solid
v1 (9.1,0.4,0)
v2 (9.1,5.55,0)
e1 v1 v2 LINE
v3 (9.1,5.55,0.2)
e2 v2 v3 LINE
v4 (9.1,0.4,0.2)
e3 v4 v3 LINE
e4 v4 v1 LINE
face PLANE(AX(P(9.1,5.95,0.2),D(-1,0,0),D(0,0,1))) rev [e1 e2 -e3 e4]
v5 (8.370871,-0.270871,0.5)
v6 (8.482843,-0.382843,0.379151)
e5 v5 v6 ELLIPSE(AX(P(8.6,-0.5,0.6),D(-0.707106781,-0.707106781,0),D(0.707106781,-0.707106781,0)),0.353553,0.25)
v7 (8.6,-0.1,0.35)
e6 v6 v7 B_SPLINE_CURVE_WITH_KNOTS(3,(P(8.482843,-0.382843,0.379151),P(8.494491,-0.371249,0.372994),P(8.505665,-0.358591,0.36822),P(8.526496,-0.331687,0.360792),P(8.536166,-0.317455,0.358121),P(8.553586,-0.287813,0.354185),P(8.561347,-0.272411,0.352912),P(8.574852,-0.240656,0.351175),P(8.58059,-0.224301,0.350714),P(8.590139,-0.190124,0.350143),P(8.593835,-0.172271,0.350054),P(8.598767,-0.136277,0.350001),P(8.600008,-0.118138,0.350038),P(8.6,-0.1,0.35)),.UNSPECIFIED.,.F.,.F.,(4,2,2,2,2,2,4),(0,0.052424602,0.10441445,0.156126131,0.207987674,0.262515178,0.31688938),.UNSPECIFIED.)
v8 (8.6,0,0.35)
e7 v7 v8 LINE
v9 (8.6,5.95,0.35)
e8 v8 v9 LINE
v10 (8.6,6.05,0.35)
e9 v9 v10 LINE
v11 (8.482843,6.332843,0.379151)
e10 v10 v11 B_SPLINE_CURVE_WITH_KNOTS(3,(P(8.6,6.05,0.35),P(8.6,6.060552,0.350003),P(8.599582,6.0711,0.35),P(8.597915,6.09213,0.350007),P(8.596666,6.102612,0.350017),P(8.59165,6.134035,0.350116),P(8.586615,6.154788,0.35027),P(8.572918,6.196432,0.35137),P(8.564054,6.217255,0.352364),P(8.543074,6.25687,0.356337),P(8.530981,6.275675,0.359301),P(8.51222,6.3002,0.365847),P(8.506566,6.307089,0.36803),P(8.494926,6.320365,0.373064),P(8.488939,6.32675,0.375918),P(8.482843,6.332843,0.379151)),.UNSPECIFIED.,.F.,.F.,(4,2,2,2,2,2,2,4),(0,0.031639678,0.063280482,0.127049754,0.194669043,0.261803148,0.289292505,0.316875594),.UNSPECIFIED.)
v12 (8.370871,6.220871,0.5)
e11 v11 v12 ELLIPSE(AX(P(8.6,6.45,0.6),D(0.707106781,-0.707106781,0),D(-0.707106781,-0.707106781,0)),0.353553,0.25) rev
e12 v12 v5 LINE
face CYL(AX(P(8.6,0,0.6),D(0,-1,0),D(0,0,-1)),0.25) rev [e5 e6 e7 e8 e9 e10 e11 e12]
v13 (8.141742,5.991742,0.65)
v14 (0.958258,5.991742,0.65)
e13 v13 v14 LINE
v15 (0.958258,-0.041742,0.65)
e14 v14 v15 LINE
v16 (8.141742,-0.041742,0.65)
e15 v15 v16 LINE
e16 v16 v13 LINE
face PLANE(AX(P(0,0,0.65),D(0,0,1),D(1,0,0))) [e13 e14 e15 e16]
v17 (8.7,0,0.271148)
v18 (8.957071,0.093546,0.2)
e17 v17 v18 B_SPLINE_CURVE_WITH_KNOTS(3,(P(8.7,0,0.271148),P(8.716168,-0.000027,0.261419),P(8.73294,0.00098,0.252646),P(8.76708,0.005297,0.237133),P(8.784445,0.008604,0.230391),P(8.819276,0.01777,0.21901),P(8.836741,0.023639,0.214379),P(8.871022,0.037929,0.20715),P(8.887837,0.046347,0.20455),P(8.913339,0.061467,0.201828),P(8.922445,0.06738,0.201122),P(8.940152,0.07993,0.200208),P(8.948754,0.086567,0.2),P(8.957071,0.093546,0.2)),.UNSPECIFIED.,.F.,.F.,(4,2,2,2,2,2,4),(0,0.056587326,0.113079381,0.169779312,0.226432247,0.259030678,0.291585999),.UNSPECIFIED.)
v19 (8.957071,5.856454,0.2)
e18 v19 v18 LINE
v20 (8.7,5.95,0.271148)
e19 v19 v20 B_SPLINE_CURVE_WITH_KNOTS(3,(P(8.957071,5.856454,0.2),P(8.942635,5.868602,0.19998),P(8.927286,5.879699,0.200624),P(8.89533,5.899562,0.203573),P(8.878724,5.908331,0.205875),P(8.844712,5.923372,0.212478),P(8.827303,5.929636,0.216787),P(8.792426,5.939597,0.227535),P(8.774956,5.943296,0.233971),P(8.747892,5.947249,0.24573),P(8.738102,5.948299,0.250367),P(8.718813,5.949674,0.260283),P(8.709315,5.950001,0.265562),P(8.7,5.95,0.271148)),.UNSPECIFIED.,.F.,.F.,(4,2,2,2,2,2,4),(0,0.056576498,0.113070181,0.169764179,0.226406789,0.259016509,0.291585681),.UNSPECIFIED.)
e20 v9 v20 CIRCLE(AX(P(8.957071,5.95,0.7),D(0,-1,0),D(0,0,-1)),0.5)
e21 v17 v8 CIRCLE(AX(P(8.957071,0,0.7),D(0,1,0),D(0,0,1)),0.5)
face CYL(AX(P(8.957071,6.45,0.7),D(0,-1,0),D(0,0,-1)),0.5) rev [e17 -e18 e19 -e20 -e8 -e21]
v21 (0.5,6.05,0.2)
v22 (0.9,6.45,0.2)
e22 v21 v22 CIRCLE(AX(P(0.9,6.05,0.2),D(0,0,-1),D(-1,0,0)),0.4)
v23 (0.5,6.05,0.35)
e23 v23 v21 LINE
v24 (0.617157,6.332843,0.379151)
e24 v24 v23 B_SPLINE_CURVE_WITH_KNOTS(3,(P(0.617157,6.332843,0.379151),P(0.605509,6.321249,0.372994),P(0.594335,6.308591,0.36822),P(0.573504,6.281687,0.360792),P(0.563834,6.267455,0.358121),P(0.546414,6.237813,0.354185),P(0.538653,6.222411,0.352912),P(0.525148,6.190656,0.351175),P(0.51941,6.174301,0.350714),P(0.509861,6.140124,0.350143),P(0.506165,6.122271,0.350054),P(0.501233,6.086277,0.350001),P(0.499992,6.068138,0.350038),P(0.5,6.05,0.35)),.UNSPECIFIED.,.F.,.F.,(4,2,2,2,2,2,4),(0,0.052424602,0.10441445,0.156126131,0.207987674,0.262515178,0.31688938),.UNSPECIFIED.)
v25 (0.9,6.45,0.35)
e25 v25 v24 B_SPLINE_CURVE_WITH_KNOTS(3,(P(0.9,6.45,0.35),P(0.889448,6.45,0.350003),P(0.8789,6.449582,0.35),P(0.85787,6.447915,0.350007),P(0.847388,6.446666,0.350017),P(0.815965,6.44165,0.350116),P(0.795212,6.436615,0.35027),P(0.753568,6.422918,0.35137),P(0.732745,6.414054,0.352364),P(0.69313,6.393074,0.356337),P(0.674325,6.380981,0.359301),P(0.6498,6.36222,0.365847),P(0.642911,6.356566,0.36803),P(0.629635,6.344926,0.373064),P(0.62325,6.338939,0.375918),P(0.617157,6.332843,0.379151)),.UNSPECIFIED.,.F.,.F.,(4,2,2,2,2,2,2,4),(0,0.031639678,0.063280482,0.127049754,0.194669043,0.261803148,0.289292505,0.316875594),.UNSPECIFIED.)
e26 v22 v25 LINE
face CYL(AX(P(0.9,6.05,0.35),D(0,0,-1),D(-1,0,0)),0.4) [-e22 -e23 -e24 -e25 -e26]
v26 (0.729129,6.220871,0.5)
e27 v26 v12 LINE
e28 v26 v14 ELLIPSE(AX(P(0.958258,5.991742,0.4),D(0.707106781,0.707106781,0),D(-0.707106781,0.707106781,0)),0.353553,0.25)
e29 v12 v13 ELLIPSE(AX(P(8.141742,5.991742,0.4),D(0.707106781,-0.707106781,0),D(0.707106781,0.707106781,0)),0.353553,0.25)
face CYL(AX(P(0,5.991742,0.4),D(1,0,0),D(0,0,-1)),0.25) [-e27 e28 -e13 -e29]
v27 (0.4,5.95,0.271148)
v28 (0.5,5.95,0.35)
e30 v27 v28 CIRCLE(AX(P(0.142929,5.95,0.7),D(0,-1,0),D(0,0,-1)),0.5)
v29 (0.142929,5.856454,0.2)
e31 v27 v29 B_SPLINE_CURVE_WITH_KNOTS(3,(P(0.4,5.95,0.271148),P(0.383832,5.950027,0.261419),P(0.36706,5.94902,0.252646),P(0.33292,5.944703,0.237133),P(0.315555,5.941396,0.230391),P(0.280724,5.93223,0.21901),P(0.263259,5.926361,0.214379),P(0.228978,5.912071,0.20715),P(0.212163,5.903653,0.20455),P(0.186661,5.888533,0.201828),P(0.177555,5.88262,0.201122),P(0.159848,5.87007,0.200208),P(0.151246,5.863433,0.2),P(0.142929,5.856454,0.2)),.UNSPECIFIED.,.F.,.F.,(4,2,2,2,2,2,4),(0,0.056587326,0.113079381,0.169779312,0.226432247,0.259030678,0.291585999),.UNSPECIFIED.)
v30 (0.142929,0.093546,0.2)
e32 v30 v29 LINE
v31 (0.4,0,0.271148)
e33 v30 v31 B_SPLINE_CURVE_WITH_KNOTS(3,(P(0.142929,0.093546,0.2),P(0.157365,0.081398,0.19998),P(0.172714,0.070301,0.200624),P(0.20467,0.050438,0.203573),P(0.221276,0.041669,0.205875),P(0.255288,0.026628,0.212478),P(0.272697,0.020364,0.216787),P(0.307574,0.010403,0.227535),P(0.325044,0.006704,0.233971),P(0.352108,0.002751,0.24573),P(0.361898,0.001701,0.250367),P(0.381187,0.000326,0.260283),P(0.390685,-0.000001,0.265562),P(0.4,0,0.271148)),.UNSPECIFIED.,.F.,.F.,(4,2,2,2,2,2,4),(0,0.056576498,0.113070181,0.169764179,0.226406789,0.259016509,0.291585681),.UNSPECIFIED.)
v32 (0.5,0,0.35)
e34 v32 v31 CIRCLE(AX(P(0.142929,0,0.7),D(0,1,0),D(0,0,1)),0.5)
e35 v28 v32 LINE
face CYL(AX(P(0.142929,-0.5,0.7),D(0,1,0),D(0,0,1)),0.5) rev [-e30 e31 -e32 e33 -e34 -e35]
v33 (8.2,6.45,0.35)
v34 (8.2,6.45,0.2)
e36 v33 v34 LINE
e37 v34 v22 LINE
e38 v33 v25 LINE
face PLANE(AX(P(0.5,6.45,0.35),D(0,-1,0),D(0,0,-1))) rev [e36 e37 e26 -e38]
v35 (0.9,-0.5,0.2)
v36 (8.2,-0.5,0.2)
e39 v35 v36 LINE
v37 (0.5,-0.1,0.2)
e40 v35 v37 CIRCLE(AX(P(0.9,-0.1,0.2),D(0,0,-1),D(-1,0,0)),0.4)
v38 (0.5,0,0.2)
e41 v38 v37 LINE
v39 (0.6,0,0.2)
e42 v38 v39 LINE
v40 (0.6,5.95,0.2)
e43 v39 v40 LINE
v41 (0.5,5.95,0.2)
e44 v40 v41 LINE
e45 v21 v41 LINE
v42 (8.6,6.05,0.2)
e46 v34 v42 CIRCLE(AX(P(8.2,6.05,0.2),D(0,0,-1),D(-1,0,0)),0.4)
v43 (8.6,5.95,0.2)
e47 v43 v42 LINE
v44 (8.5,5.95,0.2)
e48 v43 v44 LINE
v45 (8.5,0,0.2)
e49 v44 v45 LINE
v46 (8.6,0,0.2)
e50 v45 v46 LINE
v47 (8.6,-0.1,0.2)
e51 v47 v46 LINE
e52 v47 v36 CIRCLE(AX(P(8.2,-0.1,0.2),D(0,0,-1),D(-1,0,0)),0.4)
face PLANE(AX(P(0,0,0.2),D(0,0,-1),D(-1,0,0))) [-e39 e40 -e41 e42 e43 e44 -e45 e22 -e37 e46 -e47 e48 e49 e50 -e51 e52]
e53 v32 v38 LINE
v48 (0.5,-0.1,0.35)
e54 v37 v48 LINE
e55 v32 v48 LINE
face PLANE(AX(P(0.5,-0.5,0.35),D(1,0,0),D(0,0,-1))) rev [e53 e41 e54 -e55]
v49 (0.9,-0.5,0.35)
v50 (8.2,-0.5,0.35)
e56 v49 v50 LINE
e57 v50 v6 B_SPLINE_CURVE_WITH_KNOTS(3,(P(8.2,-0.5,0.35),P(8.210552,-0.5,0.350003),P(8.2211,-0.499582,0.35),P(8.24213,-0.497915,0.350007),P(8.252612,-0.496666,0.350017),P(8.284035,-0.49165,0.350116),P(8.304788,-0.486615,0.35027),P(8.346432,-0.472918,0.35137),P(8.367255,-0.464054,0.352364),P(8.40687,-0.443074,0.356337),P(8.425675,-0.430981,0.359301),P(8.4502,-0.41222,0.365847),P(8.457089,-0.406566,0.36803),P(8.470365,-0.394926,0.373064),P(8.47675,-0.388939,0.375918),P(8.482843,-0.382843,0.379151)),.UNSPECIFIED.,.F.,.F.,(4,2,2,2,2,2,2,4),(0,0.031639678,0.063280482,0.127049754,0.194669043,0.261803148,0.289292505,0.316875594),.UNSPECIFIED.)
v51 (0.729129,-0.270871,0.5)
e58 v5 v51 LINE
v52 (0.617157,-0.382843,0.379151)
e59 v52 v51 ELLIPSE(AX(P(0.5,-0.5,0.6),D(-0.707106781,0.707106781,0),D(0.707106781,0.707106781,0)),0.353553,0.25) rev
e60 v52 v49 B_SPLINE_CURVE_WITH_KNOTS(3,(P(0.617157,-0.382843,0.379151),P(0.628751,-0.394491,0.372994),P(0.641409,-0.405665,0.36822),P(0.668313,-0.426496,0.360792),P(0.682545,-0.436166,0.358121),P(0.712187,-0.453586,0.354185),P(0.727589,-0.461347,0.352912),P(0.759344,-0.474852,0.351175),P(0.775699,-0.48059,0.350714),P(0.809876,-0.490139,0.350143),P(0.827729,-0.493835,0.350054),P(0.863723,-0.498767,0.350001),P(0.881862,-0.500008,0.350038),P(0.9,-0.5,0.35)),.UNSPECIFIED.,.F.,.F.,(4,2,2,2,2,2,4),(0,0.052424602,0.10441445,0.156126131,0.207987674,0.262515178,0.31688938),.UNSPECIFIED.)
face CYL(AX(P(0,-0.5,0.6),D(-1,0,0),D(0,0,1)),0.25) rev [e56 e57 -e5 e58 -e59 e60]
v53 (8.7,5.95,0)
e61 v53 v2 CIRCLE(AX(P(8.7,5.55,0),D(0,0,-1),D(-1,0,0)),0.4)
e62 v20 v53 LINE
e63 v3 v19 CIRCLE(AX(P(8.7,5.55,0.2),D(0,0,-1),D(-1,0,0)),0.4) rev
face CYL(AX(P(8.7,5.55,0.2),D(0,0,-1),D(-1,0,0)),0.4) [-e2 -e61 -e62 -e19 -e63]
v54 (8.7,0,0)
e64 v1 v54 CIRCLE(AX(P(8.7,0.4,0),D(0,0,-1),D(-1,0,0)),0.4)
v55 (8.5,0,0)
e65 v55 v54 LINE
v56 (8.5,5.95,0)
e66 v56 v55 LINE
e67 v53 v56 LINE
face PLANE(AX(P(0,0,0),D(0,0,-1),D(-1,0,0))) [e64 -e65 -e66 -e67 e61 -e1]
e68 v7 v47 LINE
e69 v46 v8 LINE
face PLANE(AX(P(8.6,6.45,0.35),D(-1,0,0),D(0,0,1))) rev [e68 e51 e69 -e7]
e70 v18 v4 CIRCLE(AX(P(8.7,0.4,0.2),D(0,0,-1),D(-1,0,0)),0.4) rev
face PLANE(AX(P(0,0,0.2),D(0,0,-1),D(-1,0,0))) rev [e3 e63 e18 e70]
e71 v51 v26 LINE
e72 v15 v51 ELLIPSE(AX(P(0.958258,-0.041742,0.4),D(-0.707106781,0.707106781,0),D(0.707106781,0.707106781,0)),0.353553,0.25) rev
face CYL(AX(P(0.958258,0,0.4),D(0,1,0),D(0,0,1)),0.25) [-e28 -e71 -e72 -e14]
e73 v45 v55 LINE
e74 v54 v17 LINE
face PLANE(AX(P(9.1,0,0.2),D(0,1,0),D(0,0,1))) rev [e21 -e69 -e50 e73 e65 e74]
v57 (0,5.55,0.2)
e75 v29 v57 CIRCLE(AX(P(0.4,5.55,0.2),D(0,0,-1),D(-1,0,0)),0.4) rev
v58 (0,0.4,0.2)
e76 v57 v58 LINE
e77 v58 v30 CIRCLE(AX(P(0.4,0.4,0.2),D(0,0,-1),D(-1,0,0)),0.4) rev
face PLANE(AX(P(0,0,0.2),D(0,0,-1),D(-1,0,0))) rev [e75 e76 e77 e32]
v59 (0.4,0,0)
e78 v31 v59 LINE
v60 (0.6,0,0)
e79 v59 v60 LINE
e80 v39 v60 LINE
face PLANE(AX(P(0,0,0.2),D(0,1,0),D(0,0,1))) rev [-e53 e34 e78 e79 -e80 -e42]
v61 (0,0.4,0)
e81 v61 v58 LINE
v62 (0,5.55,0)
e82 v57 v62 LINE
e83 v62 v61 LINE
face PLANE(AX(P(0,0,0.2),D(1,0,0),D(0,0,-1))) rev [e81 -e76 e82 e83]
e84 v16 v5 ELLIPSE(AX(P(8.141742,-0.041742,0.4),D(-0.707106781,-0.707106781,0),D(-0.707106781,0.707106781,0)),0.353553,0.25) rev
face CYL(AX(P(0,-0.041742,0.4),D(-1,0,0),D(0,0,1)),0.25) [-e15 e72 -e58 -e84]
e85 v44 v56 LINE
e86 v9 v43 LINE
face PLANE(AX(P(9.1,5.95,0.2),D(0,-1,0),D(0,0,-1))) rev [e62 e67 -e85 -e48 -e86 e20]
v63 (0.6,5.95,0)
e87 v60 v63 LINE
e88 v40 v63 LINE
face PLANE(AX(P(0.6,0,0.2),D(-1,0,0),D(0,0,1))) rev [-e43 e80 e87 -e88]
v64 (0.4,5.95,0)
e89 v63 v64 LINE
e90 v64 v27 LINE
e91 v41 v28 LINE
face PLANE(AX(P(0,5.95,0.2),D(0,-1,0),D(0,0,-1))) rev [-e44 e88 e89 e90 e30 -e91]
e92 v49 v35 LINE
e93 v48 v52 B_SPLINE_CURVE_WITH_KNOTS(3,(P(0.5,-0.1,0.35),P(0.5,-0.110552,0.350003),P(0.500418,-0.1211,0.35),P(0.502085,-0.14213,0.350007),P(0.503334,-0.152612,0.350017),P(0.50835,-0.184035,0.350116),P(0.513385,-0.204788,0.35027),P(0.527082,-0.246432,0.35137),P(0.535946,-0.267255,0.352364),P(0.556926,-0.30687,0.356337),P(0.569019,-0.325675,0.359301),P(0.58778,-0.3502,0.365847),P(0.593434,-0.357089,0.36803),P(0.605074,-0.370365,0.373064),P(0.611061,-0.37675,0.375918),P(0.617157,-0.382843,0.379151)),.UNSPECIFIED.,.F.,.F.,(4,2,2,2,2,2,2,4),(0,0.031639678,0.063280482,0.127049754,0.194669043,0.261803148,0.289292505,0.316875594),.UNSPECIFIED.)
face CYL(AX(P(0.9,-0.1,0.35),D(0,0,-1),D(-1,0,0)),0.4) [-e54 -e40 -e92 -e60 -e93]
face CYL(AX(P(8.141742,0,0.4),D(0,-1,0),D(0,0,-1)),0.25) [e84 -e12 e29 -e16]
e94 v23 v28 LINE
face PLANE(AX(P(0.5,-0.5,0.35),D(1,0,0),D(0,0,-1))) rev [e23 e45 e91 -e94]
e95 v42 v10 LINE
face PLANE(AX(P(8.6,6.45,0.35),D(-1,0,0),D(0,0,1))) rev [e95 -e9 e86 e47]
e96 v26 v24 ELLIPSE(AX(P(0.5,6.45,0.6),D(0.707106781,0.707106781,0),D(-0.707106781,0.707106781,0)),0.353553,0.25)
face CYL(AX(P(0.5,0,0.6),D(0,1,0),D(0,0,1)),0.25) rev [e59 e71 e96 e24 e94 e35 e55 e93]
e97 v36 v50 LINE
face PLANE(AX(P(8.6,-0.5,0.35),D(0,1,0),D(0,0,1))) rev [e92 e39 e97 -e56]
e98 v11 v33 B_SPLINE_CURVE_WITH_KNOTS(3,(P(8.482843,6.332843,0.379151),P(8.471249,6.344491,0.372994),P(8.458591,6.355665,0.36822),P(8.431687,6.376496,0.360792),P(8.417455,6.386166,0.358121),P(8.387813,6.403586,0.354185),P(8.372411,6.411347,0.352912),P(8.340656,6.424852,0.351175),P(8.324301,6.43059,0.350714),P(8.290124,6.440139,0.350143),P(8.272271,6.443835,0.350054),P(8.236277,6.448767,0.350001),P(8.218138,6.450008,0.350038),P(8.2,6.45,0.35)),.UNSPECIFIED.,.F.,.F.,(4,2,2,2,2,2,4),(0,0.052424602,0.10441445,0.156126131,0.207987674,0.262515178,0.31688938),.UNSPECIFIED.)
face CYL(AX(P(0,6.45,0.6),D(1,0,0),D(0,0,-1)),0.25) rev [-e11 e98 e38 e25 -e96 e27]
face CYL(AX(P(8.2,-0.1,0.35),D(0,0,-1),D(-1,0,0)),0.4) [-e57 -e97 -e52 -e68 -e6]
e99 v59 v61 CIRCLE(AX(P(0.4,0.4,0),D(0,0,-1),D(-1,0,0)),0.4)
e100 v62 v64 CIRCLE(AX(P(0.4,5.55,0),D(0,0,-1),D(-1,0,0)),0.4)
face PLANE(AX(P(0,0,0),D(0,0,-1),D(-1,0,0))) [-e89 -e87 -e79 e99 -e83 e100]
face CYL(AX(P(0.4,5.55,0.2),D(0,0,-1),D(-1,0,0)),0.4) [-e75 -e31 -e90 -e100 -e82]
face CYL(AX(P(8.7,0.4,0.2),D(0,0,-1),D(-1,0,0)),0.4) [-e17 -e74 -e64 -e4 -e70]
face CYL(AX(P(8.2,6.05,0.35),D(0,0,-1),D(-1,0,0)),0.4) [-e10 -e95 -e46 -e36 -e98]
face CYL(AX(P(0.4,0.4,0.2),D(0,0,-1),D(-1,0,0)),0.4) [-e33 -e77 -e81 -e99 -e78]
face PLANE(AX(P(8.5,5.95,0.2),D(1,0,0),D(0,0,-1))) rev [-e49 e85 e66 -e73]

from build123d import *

# Parameters (mm, degrees)
SKETCH1_W             = 0.6
SKETCH1_H             = 5.95
BOSS_EXTRUDE1_DEPTH   = 0.2
BOSS_EXTRUDE1_2_DEPTH = 0.2
BOSS_EXTRUDE2_DEPTH   = 0.15
FILLET1_R             = 0.5
FILLET2_R             = 0.5
SKETCH3_W             = 7.6
SKETCH3_H             = 6.45
BOSS_EXTRUDE3_DEPTH   = 0.3
FILLET3_R             = 0.25
FILLET4_R             = 0.25
FILLET5_R             = 0.25
FILLET6_R             = 0.25
FILLET7_R             = 0.4


# Some blends are built 0.0001 mm under size
with BuildPart() as part:
    # Sketch1 → Boss-Extrude1 (new body)
    with BuildSketch(Plane.XY):
        with Locations((0.3, 2.975)):
            Rectangle(SKETCH1_W, SKETCH1_H)
    extrude(amount=BOSS_EXTRUDE1_DEPTH)



with BuildPart() as body_2:
    # Sketch1 → Boss-Extrude1 2 (new body)
    with BuildSketch(Plane.XY):
        with Locations((8.8, 2.975)):
            Rectangle(SKETCH1_W, SKETCH1_H)
    extrude(amount=BOSS_EXTRUDE1_2_DEPTH)


with BuildPart() as part_1:
    add(part.part)

    add(body_2.part)  # Boss-Extrude2 merges body 2
    # Sketch2 → Boss-Extrude2 (add)
    with BuildSketch(Plane.XY.offset(0.2)):
        Polygon((8.6, 6.45), (8.6, -0.5), (7.9, -0.5), (1.2, -0.5), (0.5, -0.5), (0.5, 6.45), (1.2, 6.45), (7.9, 6.45), align=None)
    extrude(amount=BOSS_EXTRUDE2_DEPTH)

    # Fillet1
    # the kernel refuses this fillet: 0.5 mm, written as the material it adds along each edge
    with BuildSketch(Plane(origin=(0.5, 0, 0.2), x_dir=(-1, 0, 0), z_dir=(0, 1, 0))) as fillet1_piece_1:
        with BuildLine():
            CenterArc((0.357071421, 0.5), FILLET1_R, 224.427004001, 45.572995999)
            Line((0, 0.15), (0, 0))
            Line((0, 0), (0.357071421, 0))
        make_face()
    extrude(amount=5.95)

    # Fillet2
    # the kernel refuses this fillet: 0.5 mm, written as the material it adds along each edge
    with BuildSketch(Plane(origin=(8.6, 5.95, 0.2), x_dir=(0, 0, 1), z_dir=(0, -1, 0))) as fillet2_piece_1:
        with BuildLine():
            CenterArc((0.5, -0.357071421), FILLET2_R, 134.427004001, 45.572995999)
            Line((0, -0.357071421), (0, 0))
            Line((0, 0), (0.15, 0))
        make_face()
    extrude(amount=5.95)

    # Sketch3 → Boss-Extrude3 (add)
    with BuildSketch(Plane.XY.offset(0.35)):
        with Locations((4.55, 2.975)):
            Rectangle(SKETCH3_W, SKETCH3_H)
    extrude(amount=BOSS_EXTRUDE3_DEPTH)

    # Fillet3
    fillet3_edges = [part_1.edges().sort_by_distance(p)[0] for p in [
        (0.75, 2.975, 0.35),
    ]]
    fillet(fillet3_edges, radius=FILLET3_R - 0.0001)  # a hair under: the kernel refuses the full size

    # Fillet4
    fillet4_edges = [part_1.edges().sort_by_distance(p)[0] for p in [
        (8.35, 2.975, 0.35),
    ]]
    fillet(fillet4_edges, radius=FILLET4_R - 0.0001)  # a hair under: the kernel refuses the full size

    # Fillet5
    fillet5_edges = [part_1.edges().sort_by_distance(p)[0] for p in [
        (4.55, 6.2, 0.35),
        (4.55, -0.25, 0.35),
    ]]
    fillet(fillet5_edges, radius=FILLET5_R - 0.0001)  # a hair under: the kernel refuses the full size

    # Fillet6
    fillet6_edges = [part_1.edges().sort_by_distance(p)[0] for p in [
        (8.35, 2.975, 0.65),
        (4.55, 6.2, 0.65),
        (4.55, -0.25, 0.65),
        (0.75, 2.975, 0.65),
    ]]
    fillet(fillet6_edges, radius=FILLET6_R)

    # Fillet7
    # the kernel refuses this fillet: 0.4 mm, written as the material it takes off along each edge
    with BuildSketch(Plane(origin=(9.1, 5.95, -1), x_dir=(-1, 0, 0), z_dir=(0, 0, 1)), Plane(origin=(0, 0, -1), x_dir=(1, 0, 0), z_dir=(0, 0, 1))) as fillet7_piece_1:
        with BuildLine():
            CenterArc((FILLET7_R, FILLET7_R), FILLET7_R, 180, 90)
            Line((0, FILLET7_R), (0, 0))
            Line((0, 0), (FILLET7_R, 0))
        make_face()
    extrude(amount=2.2, mode=Mode.SUBTRACT)
    with BuildSketch(Plane(origin=(8.6, 6.45, -0.8), x_dir=(0, -1, 0), z_dir=(0, 0, 1))) as fillet7_piece_2:
        with BuildLine():
            CenterArc((FILLET7_R, -FILLET7_R), FILLET7_R, 90, 90)
            Line((0, -FILLET7_R), (0, 0))
            Line((0, 0), (FILLET7_R, 0))
        make_face()
    extrude(amount=2.15, mode=Mode.SUBTRACT)
    with BuildSketch(Plane(origin=(8.6, -0.5, -0.8), x_dir=(0, 1, 0), z_dir=(0, 0, 1)), Plane(origin=(0.5, 6.45, -0.8), x_dir=(0, -1, 0), z_dir=(0, 0, 1)), Plane(origin=(0.5, -0.5, -0.8), x_dir=(1, 0, 0), z_dir=(0, 0, 1))) as fillet7_piece_3:
        with BuildLine():
            CenterArc((FILLET7_R, FILLET7_R), FILLET7_R, 180, 90)
            Line((0, FILLET7_R), (0, 0))
            Line((0, 0), (FILLET7_R, 0))
        make_face()
    extrude(amount=2.15, mode=Mode.SUBTRACT)
    with BuildSketch(Plane(origin=(9.1, 0, -1), x_dir=(-1, 0, 0), z_dir=(0, 0, 1)), Plane(origin=(0, 5.95, -1), x_dir=(1, 0, 0), z_dir=(0, 0, 1))) as fillet7_piece_4:
        with BuildLine():
            CenterArc((FILLET7_R, -FILLET7_R), FILLET7_R, 90, 90)
            Line((0, -FILLET7_R), (0, 0))
            Line((0, 0), (FILLET7_R, 0))
        make_face()
    extrude(amount=2.2, mode=Mode.SUBTRACT)


solid = part_1.part
